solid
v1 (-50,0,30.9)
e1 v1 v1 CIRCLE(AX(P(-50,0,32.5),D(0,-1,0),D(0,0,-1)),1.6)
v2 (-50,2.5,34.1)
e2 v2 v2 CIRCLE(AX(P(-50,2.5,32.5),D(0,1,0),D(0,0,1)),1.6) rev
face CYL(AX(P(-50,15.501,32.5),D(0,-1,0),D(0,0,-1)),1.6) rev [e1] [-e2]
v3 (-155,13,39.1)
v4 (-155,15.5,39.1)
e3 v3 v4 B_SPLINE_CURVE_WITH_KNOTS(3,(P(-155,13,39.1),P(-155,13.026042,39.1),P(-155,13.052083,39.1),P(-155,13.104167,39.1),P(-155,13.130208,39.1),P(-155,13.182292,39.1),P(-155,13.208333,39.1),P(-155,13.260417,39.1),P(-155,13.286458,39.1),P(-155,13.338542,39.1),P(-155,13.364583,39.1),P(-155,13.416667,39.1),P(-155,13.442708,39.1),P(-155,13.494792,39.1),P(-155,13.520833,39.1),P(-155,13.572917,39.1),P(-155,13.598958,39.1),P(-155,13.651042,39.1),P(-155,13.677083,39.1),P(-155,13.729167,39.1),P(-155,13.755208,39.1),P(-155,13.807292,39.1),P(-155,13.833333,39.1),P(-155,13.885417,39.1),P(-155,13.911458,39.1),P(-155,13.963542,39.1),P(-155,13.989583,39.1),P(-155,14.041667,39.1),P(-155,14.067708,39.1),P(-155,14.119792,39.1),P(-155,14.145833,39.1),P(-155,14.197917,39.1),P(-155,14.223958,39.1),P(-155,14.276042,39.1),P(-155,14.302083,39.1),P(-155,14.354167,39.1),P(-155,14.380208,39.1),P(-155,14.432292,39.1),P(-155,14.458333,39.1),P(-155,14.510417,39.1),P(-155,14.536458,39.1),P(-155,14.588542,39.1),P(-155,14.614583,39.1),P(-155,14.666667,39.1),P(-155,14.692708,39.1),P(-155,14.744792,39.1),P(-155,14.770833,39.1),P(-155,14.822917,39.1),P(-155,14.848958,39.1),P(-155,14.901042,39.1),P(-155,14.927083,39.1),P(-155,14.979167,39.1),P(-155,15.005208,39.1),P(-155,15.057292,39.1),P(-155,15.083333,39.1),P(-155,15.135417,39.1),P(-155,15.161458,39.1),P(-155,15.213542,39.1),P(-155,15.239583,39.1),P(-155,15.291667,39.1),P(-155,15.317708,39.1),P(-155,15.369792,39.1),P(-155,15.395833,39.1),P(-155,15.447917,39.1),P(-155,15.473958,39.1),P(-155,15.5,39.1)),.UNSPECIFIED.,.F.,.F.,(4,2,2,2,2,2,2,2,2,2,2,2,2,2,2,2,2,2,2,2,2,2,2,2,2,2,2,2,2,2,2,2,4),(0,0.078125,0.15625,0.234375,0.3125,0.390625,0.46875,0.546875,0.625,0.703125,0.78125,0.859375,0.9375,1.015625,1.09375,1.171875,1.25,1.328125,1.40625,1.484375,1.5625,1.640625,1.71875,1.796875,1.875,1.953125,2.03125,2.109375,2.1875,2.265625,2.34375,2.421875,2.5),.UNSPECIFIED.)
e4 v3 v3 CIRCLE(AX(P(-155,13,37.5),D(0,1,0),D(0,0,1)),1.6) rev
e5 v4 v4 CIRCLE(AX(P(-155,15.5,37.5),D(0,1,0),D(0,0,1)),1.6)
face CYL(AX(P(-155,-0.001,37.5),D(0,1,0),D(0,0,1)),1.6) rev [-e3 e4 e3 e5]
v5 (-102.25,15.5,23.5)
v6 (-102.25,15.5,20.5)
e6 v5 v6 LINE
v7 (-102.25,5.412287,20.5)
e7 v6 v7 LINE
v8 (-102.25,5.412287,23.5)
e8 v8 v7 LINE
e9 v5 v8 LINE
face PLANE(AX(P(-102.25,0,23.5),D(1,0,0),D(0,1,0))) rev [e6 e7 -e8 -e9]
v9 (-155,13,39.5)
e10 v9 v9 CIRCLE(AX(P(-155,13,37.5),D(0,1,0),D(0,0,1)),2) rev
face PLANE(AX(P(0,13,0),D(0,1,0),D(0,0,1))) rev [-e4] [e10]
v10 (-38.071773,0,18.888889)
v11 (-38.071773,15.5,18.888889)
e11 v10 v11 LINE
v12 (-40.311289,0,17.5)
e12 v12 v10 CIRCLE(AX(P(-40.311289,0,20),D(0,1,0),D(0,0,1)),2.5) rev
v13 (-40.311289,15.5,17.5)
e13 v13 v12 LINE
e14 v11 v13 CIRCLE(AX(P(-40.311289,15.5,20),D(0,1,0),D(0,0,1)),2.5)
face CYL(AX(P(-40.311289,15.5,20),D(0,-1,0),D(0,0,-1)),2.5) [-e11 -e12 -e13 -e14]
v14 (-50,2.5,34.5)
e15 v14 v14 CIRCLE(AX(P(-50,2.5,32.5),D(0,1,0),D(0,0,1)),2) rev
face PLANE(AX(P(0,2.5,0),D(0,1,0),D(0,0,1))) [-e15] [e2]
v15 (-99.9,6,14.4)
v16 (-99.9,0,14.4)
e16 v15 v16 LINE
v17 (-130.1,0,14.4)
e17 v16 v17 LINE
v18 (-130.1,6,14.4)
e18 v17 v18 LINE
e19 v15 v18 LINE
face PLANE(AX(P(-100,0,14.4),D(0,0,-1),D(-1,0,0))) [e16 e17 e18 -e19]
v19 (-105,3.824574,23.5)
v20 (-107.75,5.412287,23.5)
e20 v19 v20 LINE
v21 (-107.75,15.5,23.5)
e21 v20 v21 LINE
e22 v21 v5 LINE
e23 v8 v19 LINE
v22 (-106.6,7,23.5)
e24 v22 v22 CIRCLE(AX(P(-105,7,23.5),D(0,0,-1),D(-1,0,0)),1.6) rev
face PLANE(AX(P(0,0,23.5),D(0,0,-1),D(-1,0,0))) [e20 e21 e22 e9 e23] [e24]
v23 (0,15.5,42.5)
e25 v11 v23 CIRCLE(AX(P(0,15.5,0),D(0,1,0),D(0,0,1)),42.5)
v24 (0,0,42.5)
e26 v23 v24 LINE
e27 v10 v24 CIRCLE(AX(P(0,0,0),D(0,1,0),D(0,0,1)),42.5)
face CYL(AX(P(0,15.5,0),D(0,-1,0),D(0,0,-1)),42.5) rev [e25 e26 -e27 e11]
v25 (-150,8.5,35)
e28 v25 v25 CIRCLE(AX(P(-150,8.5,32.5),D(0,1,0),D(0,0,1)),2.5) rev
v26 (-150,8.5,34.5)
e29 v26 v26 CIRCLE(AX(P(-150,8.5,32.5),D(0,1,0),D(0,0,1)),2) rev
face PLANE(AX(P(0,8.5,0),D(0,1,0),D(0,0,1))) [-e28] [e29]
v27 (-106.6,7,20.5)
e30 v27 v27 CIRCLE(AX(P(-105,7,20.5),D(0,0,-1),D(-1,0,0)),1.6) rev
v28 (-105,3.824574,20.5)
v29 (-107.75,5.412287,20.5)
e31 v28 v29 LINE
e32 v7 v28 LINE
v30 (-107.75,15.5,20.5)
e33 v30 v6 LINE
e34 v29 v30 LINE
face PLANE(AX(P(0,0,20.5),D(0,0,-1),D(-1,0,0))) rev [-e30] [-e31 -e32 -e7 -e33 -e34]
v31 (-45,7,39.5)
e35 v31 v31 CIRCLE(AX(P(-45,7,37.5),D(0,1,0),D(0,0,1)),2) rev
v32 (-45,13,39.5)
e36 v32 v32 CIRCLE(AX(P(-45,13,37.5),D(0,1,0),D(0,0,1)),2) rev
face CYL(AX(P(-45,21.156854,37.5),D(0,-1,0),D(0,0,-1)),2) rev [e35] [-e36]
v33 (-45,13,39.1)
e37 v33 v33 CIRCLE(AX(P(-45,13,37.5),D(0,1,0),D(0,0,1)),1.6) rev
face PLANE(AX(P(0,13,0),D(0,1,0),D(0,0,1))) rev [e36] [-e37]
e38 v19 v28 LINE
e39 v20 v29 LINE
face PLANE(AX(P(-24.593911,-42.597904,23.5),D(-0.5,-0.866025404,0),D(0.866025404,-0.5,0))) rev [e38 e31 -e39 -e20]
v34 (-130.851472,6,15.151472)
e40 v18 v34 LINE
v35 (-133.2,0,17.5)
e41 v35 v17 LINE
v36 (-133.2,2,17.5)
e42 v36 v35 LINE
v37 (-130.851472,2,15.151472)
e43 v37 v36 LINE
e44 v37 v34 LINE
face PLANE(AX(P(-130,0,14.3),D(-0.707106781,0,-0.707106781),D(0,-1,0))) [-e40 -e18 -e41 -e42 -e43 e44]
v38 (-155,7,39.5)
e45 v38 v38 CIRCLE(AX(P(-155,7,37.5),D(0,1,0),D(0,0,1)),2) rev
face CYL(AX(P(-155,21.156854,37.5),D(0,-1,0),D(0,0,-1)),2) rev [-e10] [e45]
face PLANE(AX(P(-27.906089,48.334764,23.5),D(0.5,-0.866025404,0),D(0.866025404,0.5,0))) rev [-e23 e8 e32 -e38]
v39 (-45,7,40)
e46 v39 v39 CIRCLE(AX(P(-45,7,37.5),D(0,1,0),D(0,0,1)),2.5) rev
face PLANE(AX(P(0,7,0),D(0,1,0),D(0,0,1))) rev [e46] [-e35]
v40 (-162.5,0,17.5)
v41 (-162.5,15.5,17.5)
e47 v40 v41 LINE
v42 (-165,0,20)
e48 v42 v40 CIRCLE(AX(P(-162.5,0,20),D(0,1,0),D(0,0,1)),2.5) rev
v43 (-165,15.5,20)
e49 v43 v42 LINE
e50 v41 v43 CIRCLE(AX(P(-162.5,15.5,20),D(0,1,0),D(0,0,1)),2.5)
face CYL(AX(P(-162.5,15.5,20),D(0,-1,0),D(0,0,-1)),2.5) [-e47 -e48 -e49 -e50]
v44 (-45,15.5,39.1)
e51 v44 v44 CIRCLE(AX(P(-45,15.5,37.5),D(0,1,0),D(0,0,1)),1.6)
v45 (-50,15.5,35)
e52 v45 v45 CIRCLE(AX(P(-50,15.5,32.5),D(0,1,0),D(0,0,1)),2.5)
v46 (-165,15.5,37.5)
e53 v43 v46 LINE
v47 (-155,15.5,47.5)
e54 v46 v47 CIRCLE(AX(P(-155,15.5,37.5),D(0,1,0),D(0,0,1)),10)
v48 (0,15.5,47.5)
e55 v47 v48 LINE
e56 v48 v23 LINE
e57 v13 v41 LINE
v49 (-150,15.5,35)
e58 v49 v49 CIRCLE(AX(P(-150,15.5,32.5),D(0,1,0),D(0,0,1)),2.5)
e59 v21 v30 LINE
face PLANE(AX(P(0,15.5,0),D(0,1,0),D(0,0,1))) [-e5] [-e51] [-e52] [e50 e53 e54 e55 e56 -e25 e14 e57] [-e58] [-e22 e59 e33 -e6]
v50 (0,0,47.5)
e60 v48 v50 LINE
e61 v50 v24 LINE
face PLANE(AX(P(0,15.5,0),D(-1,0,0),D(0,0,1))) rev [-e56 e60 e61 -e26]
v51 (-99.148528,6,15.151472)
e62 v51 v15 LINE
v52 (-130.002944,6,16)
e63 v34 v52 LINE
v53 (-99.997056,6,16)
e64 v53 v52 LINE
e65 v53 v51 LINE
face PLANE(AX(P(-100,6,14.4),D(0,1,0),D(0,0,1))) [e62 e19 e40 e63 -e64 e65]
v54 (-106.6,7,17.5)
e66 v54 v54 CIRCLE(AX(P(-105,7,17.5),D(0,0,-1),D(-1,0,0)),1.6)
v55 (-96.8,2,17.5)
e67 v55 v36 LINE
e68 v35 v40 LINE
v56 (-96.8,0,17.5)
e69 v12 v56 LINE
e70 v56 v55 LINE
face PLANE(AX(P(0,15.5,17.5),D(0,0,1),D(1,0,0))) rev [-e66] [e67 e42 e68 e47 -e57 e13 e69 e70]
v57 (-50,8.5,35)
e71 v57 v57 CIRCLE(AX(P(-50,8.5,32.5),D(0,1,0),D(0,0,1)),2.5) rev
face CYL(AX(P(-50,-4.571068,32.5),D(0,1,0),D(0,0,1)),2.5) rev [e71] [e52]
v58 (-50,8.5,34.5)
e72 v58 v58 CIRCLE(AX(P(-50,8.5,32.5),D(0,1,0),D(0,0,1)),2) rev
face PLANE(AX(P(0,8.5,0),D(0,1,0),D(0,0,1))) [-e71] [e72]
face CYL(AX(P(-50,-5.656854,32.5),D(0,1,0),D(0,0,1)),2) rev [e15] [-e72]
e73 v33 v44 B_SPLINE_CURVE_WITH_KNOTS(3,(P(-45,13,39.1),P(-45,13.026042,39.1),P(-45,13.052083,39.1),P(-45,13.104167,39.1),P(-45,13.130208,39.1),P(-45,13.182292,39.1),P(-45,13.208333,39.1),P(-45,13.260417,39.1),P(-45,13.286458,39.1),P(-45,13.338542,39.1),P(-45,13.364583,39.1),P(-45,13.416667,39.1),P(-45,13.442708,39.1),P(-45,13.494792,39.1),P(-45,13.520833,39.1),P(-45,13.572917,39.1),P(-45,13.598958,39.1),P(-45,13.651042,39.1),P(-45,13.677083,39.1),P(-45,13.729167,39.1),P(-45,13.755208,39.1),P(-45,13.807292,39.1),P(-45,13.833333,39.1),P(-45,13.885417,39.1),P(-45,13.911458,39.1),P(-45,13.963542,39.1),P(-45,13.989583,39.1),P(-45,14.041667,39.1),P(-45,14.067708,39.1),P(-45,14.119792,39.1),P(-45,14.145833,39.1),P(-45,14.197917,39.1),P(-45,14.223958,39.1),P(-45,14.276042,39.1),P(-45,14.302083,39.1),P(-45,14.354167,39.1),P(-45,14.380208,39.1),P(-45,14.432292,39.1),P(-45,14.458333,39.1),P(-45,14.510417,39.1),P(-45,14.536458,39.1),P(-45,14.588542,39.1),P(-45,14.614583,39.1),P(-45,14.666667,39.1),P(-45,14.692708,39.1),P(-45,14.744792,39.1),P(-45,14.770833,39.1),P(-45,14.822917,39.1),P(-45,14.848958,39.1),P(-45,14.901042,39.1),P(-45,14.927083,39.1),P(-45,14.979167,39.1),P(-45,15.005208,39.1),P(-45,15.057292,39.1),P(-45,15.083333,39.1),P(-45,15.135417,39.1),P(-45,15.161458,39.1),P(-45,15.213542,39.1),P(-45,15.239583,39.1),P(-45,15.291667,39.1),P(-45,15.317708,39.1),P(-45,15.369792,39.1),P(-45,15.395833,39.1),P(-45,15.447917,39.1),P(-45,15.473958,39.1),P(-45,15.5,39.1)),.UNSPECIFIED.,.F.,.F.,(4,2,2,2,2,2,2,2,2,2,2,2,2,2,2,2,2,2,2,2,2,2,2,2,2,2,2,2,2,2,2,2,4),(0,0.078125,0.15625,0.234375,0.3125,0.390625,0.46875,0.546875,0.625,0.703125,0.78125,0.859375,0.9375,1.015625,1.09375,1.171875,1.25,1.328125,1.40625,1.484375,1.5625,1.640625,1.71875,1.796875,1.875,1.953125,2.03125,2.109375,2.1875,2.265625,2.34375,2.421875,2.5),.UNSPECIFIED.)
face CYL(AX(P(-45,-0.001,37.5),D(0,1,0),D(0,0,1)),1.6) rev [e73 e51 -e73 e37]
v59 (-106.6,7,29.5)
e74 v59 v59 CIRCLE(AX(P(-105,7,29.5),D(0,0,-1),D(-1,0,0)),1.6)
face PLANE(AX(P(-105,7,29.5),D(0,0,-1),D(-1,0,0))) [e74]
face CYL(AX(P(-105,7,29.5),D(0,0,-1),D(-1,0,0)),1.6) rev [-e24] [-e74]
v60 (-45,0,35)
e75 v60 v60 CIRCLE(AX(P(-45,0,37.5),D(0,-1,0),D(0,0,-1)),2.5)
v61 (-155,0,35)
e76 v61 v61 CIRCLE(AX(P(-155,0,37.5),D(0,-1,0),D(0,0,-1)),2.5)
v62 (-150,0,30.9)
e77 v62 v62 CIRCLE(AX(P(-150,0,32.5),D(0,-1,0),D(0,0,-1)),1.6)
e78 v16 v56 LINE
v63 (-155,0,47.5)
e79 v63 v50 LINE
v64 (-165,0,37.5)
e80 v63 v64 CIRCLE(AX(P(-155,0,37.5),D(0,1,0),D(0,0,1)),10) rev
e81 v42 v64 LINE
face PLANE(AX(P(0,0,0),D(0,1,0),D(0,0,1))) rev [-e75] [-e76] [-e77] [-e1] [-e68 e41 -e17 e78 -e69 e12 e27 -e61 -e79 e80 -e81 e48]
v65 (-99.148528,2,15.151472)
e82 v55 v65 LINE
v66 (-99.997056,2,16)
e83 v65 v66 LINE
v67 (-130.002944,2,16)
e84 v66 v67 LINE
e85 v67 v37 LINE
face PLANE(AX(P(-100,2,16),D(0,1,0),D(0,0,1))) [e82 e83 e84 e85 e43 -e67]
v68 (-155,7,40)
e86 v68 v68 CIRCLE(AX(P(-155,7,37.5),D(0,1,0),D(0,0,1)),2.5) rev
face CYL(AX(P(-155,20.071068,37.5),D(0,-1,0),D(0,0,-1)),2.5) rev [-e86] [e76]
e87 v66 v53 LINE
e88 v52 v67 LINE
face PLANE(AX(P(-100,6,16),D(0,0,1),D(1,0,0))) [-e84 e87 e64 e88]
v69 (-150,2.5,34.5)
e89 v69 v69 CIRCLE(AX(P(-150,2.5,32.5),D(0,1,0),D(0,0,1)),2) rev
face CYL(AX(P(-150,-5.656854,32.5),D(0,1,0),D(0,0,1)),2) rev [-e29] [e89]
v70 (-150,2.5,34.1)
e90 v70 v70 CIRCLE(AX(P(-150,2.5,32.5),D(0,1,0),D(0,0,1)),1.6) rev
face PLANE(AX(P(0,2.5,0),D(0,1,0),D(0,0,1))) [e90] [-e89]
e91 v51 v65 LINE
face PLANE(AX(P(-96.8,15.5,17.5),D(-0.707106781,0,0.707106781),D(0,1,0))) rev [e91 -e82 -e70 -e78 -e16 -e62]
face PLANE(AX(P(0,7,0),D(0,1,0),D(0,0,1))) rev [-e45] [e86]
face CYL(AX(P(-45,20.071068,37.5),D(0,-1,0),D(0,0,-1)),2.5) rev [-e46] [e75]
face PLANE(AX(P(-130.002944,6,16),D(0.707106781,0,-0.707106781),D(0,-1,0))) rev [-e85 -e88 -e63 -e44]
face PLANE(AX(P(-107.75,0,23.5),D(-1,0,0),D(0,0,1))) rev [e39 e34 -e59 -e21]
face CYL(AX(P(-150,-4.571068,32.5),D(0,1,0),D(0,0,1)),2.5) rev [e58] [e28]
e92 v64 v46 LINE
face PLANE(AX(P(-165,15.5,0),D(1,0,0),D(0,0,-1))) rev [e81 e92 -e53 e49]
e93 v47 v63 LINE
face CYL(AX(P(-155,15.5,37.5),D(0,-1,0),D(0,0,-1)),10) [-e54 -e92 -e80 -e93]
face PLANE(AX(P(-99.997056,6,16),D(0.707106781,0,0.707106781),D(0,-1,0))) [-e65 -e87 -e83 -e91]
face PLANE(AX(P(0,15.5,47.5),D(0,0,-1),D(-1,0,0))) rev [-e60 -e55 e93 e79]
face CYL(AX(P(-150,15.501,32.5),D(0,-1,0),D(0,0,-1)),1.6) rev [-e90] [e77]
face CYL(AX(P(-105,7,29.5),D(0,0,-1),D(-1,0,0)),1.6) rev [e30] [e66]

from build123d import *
from OCP.BRepFilletAPI import BRepFilletAPI_MakeChamfer, BRepFilletAPI_MakeFillet

# Parameters (mm, degrees)
BOSS_EXTRU_1_DEPTH      = 15.5
BOSS_EXTRU_2_START      = -35
BOSS_EXTRU_2_DEPTH      = 30
CHANFREIN1_SIZE         = 3.2
CHANFREIN2_SIZE         = 1.2
CHANFREIN2_SIZE2        = 1.697056275
CONG_1_R1               = 10
CONG_1_R2               = 2.5
ENL_V_MAT_EXTRU_1_REACH = 174.399
ESQUISSE3_R             = 1.6
ESQUISSE4_R             = 2
ENL_V_MAT_EXTRU_2_DEPTH = 13
ESQUISSE9_R             = 2.5
ENL_V_MAT_EXTRU_7_DEPTH = 7
ENL_V_MAT_EXTRU_3_REACH = 174.399
ESQUISSE5_R             = 1.6
ESQUISSE6_R             = 2
ENL_V_MAT_EXTRU_4_DEPTH = 13
ESQUISSE10_R            = 2.5
ENL_V_MAT_EXTRU_8_DEPTH = 7
ESQUISSE7_R             = 1.6
ENL_V_MAT_EXTRU_5_DEPTH = 12
ENL_V_START             = -3
ENL_V_MAT_EXTRU_6_DEPTH = 3


with BuildPart() as part:
    # Esquisse1 → Boss.-Extru.1 (new body)
    with BuildSketch(Plane(origin=(0, 0, 0), x_dir=(1, 0, 0), z_dir=(0, 1, 0))):
        with BuildLine():
            ThreePointArc((0, -42.5), (-23.048861143, -35.707142143), (-38.729833462, -17.5))
            Line((-38.729833462, -17.5), (-165, -17.5))
            Line((-165, -17.5), (-165, -47.5))
            Line((-165, -47.5), (0, -47.5))
            Line((0, -47.5), (0, -42.5))
        make_face()
    extrude(amount=BOSS_EXTRU_1_DEPTH)

    # Esquisse11 → Boss.-Extru.2 (add)
    with BuildSketch(Plane.ZY.offset(165).offset(BOSS_EXTRU_2_START)):
        Polygon((17.5, 0), (14.4, 0), (14.4, 6), (16, 6), (16, 2), (17.5, 2), align=None)
    extrude(amount=-BOSS_EXTRU_2_DEPTH)

    # Chanfrein1
    # the kernel refuses this chamfer: 3.2 mm, written as the material it adds along each edge
    with BuildSketch(Plane(origin=(-100, 10.229385561, 17.5), x_dir=(0.9996219169112968, 0, 0.027495876610586226), z_dir=(0, -1, 0))) as chanfrein1_piece_1_section:
        Polygon((CHANFREIN1_SIZE * 0.999621916911, -CHANFREIN1_SIZE * 0.0274958766106), (-CHANFREIN1_SIZE * 0.0274958766106, -CHANFREIN1_SIZE * 0.999621916911), (0, 0), align=None)
    chanfrein1_piece_1 = extrude(amount=10.229385561, mode=Mode.PRIVATE)
    chanfrein1_piece_1 = split(chanfrein1_piece_1, bisect_by=Plane(origin=(-99.489179746, 2, 15.404286374), z_dir=(0, 1, 0)), keep=Keep.TOP, mode=Mode.PRIVATE)
    chanfrein1_piece_1 = split(chanfrein1_piece_1, bisect_by=Plane(origin=(-99.489179746, 4, 14.4), z_dir=(0, 0, 1)), keep=Keep.TOP, mode=Mode.PRIVATE)
    chanfrein1_piece_1 = split(chanfrein1_piece_1, bisect_by=Plane(origin=(-99.489179746, 6, 15.404286374), z_dir=(0, -1, 0)), keep=Keep.TOP, mode=Mode.PRIVATE)
    chanfrein1_piece_1 = split(chanfrein1_piece_1, bisect_by=Plane(origin=(-99.489179746, 4, 16), z_dir=(0, 0, -1)), keep=Keep.TOP, mode=Mode.PRIVATE)
    add(chanfrein1_piece_1)
    with BuildSketch(Plane(origin=(-100, 2, 17.5), x_dir=(0.9996219169112968, 0, 0.027495876610585147), z_dir=(0, -1, 0))) as chanfrein1_piece_2_section:
        Polygon((CHANFREIN1_SIZE * 0.999621916911, -CHANFREIN1_SIZE * 0.0274958766106), (-CHANFREIN1_SIZE * 0.0274958766106, -CHANFREIN1_SIZE * 0.999621916911), (0, 0), align=None)
    chanfrein1_piece_2 = extrude(amount=2, mode=Mode.PRIVATE)
    chanfrein1_piece_2 = split(chanfrein1_piece_2, bisect_by=Plane(origin=(-98.721329155, 1, 16), z_dir=(0, 0, 1)), keep=Keep.TOP, mode=Mode.PRIVATE)
    add(chanfrein1_piece_2)
    with BuildSketch(Plane(origin=(-100, 2, 17.5), x_dir=(0.9996219169112968, 0, 0.027495876610585147), z_dir=(0, -1, 0))) as chanfrein1_piece_3_section:
        Polygon((CHANFREIN1_SIZE * 0.999621916911, -CHANFREIN1_SIZE * 0.0274958766106), (-CHANFREIN1_SIZE * 0.0274958766106, -CHANFREIN1_SIZE * 0.999621916911), (0, 0), align=None)
    chanfrein1_piece_3 = extrude(amount=2, mode=Mode.PRIVATE)
    chanfrein1_piece_3 = split(chanfrein1_piece_3, bisect_by=Plane(origin=(-99.489179746, 1, 14.4), z_dir=(0, 0, 1)), keep=Keep.TOP, mode=Mode.PRIVATE)
    chanfrein1_piece_3 = split(chanfrein1_piece_3, bisect_by=Plane(origin=(-99.489179746, 1, 16), z_dir=(0, 0, -1)), keep=Keep.TOP, mode=Mode.PRIVATE)
    add(chanfrein1_piece_3)
    with BuildSketch(Plane(origin=(-130, 10.229385561, 17.5), x_dir=(-0.9996219169112966, 0, 0.02749587661058634), z_dir=(0, -1, 0))) as chanfrein1_piece_4_section:
        Polygon((CHANFREIN1_SIZE * 0.999621916911, CHANFREIN1_SIZE * 0.0274958766106), (-CHANFREIN1_SIZE * 0.0274958766106, CHANFREIN1_SIZE * 0.999621916911), (0, 0), align=None)
    chanfrein1_piece_4 = extrude(amount=10.229385561, mode=Mode.PRIVATE)
    chanfrein1_piece_4 = split(chanfrein1_piece_4, bisect_by=Plane(origin=(-130.510820254, 2, 15.404286374), z_dir=(0, 1, 0)), keep=Keep.TOP, mode=Mode.PRIVATE)
    chanfrein1_piece_4 = split(chanfrein1_piece_4, bisect_by=Plane(origin=(-130.510820254, 4, 14.4), z_dir=(0, 0, 1)), keep=Keep.TOP, mode=Mode.PRIVATE)
    chanfrein1_piece_4 = split(chanfrein1_piece_4, bisect_by=Plane(origin=(-130.510820254, 6, 15.404286374), z_dir=(0, -1, 0)), keep=Keep.TOP, mode=Mode.PRIVATE)
    chanfrein1_piece_4 = split(chanfrein1_piece_4, bisect_by=Plane(origin=(-130.510820254, 4, 16), z_dir=(0, 0, -1)), keep=Keep.TOP, mode=Mode.PRIVATE)
    add(chanfrein1_piece_4)
    with BuildSketch(Plane(origin=(-130, 2, 17.5), x_dir=(-0.9996219169112966, 0, 0.027495876610585262), z_dir=(0, -1, 0))) as chanfrein1_piece_5_section:
        Polygon((CHANFREIN1_SIZE * 0.999621916911, CHANFREIN1_SIZE * 0.0274958766106), (-CHANFREIN1_SIZE * 0.0274958766106, CHANFREIN1_SIZE * 0.999621916911), (0, 0), align=None)
    chanfrein1_piece_5 = extrude(amount=2, mode=Mode.PRIVATE)
    chanfrein1_piece_5 = split(chanfrein1_piece_5, bisect_by=Plane(origin=(-131.278670845, 1, 16), z_dir=(0, 0, 1)), keep=Keep.TOP, mode=Mode.PRIVATE)
    add(chanfrein1_piece_5)
    with BuildSketch(Plane(origin=(-130, 2, 17.5), x_dir=(-0.9996219169112966, 0, 0.027495876610585262), z_dir=(0, -1, 0))) as chanfrein1_piece_6_section:
        Polygon((CHANFREIN1_SIZE * 0.999621916911, CHANFREIN1_SIZE * 0.0274958766106), (-CHANFREIN1_SIZE * 0.0274958766106, CHANFREIN1_SIZE * 0.999621916911), (0, 0), align=None)
    chanfrein1_piece_6 = extrude(amount=2, mode=Mode.PRIVATE)
    chanfrein1_piece_6 = split(chanfrein1_piece_6, bisect_by=Plane(origin=(-130.510820254, 1, 14.4), z_dir=(0, 0, 1)), keep=Keep.TOP, mode=Mode.PRIVATE)
    chanfrein1_piece_6 = split(chanfrein1_piece_6, bisect_by=Plane(origin=(-130.510820254, 1, 16), z_dir=(0, 0, -1)), keep=Keep.TOP, mode=Mode.PRIVATE)
    add(chanfrein1_piece_6)

    # Chanfrein2: one chamfer whose edges measure the first distance from different faces: ONE call of the kernel's chamfer builder (chamfer() names one face for all edges)
    chanfrein2_edges_1 = [part.edges().sort_by_distance(p)[0] for p in [
        (-98.3, 4, 16),
    ]]
    chanfrein2_side_1 = [part.faces().sort_by_distance(p)[0] for p in [
        (-98.730952381, 2.523809524, 15.569047619),
    ]]
    chanfrein2_edges_2 = [part.edges().sort_by_distance(p)[0] for p in [
        (-131.7, 4, 16),
    ]]
    chanfrein2_side_2 = [part.faces().sort_by_distance(p)[0] for p in [
        (-131.269047619, 2.523809524, 15.569047619),
    ]]
    chanfrein2 = BRepFilletAPI_MakeChamfer(part.part.solid().wrapped)
    for e in chanfrein2_edges_1:
        chanfrein2.Add(CHANFREIN2_SIZE, CHANFREIN2_SIZE2, e.wrapped, chanfrein2_side_1[0].wrapped)  # the first distance lies on this face
    for e in chanfrein2_edges_2:
        chanfrein2.Add(CHANFREIN2_SIZE, CHANFREIN2_SIZE2, e.wrapped, chanfrein2_side_2[0].wrapped)  # the first distance lies on this face
    add(Compound.cast(chanfrein2.Shape()), mode=Mode.REPLACE)

    # Congé1: one fillet with a radius per group of edges: ONE call of the kernel's fillet builder (fillet() takes one radius for all edges)
    cong_1_edges_1 = [part.edges().sort_by_distance(p)[0] for p in [
        (-165, 7.75, 47.5),
    ]]
    cong_1_edges_2 = [part.edges().sort_by_distance(p)[0] for p in [
        (-165, 7.75, 17.5),
        (-38.729833462, 7.75, 17.5),
    ]]
    cong_1 = BRepFilletAPI_MakeFillet(part.part.solid().wrapped)
    for e in cong_1_edges_1:
        cong_1.Add(CONG_1_R1, e.wrapped)
    for e in cong_1_edges_2:
        cong_1.Add(CONG_1_R2, e.wrapped)
    add(Compound.cast(cong_1.Shape()), mode=Mode.REPLACE)

    # Esquisse3 → Enlèv. mat.-Extru.1 (cut, up to next)
    with BuildSketch(Plane(origin=(0, 15.5, 0), x_dir=(1, 0, 0), z_dir=(0, 1, 0)), mode=Mode.PRIVATE) as enl_v_mat_extru_1_sk1:
        with Locations(Location((-155, -37.5, 0), (0, 0, 270))):
            Circle(ESQUISSE3_R)
    enl_v_mat_extru_1_tool1 = extrude(enl_v_mat_extru_1_sk1.sketch, amount=-ENL_V_MAT_EXTRU_1_REACH, mode=Mode.PRIVATE) & part.part
    # Esquisse3 → Enlèv. mat.-Extru.1 (cut, up to next)
    with BuildSketch(Plane(origin=(0, 15.5, 0), x_dir=(1, 0, 0), z_dir=(0, 1, 0)), mode=Mode.PRIVATE) as enl_v_mat_extru_1_sk2:
        with Locations(Location((-45, -37.5, 0), (0, 0, 270))):
            Circle(ESQUISSE3_R)
    enl_v_mat_extru_1_tool2 = extrude(enl_v_mat_extru_1_sk2.sketch, amount=-ENL_V_MAT_EXTRU_1_REACH, mode=Mode.PRIVATE) & part.part
    add(enl_v_mat_extru_1_tool1.solids().sort_by_distance((-155, 15.5, 37.5))[0], mode=Mode.SUBTRACT)
    add(enl_v_mat_extru_1_tool2.solids().sort_by_distance((-45, 15.5, 37.5))[0], mode=Mode.SUBTRACT)

    # Esquisse4 → Enlèv. mat.-Extru.2 (cut)
    with BuildSketch(Plane.XZ):
        with Locations(Location((-155, 37.5, 0), (0, 0, 270))):
            Circle(ESQUISSE4_R)
        with Locations(Location((-45, 37.5, 0), (0, 0, 270))):
            Circle(ESQUISSE4_R)
    extrude(amount=-ENL_V_MAT_EXTRU_2_DEPTH, mode=Mode.SUBTRACT)

    # Esquisse9 → Enlèv. mat.-Extru.7 (cut)
    with BuildSketch(Plane.XZ):
        with Locations(Location((-155, 37.5, 0), (0, 0, 270))):
            Circle(ESQUISSE9_R)
        with Locations(Location((-45, 37.5, 0), (0, 0, 270))):
            Circle(ESQUISSE9_R)
    extrude(amount=-ENL_V_MAT_EXTRU_7_DEPTH, mode=Mode.SUBTRACT)

    # Esquisse5 → Enlèv. mat.-Extru.3 (cut, up to next)
    with BuildSketch(Plane.XZ, mode=Mode.PRIVATE) as enl_v_mat_extru_3_sk1:
        with Locations(Location((-150, 32.5, 0), (0, 0, 270))):
            Circle(ESQUISSE5_R)
    enl_v_mat_extru_3_tool1 = extrude(enl_v_mat_extru_3_sk1.sketch, amount=-ENL_V_MAT_EXTRU_3_REACH, mode=Mode.PRIVATE) & part.part
    # Esquisse5 → Enlèv. mat.-Extru.3 (cut, up to next)
    with BuildSketch(Plane.XZ, mode=Mode.PRIVATE) as enl_v_mat_extru_3_sk2:
        with Locations(Location((-50, 32.5, 0), (0, 0, 270))):
            Circle(ESQUISSE5_R)
    enl_v_mat_extru_3_tool2 = extrude(enl_v_mat_extru_3_sk2.sketch, amount=-ENL_V_MAT_EXTRU_3_REACH, mode=Mode.PRIVATE) & part.part
    add(enl_v_mat_extru_3_tool1.solids().sort_by_distance((-150, 0, 32.5))[0], mode=Mode.SUBTRACT)
    add(enl_v_mat_extru_3_tool2.solids().sort_by_distance((-50, 0, 32.5))[0], mode=Mode.SUBTRACT)

    # Esquisse6 → Enlèv. mat.-Extru.4 (cut)
    with BuildSketch(Plane(origin=(0, 15.5, 0), x_dir=(1, 0, 0), z_dir=(0, 1, 0))):
        with Locations(Location((-150, -32.5, 0), (0, 0, 270))):
            Circle(ESQUISSE6_R)
        with Locations(Location((-50, -32.5, 0), (0, 0, 270))):
            Circle(ESQUISSE6_R)
    extrude(amount=-ENL_V_MAT_EXTRU_4_DEPTH, mode=Mode.SUBTRACT)

    # Esquisse10 → Enlèv. mat.-Extru.8 (cut)
    with BuildSketch(Plane(origin=(0, 15.5, 0), x_dir=(1, 0, 0), z_dir=(0, 1, 0))):
        with Locations(Location((-50, -32.5, 0), (0, 0, 270))):
            Circle(ESQUISSE10_R)
        with Locations(Location((-150, -32.5, 0), (0, 0, 270))):
            Circle(ESQUISSE10_R)
    extrude(amount=-ENL_V_MAT_EXTRU_8_DEPTH, mode=Mode.SUBTRACT)

    # Esquisse7 → Enlèv. mat.-Extru.5 (cut)
    with BuildSketch(Plane(origin=(0, 0, 17.5), x_dir=(-1, 0, 0), z_dir=(0, 0, -1))):
        with Locations((105, 7)):
            Circle(ESQUISSE7_R)
    extrude(amount=-ENL_V_MAT_EXTRU_5_DEPTH, mode=Mode.SUBTRACT)

    # Esquisse8 → Enlèv. mat.-Extru.6 (cut)
    with BuildSketch(Plane(origin=(0, 0, 17.5), x_dir=(-1, 0, 0), z_dir=(0, 0, -1)).offset(ENL_V_START)):
        Polygon((102.25, 5.41228676), (105, 3.824573519), (107.75, 5.41228676), (107.75, 8.58771324), (102.25, 8.58771324), align=None)
        Polygon((102.25, 8.58771324), (107.75, 8.58771324), (105, 10.175426481), align=None)
        Polygon((105, 10.175426481), (107.75, 8.58771324), (107.75, 15.5), (102.25, 15.5), (102.25, 8.58771324), align=None)
    extrude(amount=-ENL_V_MAT_EXTRU_6_DEPTH, mode=Mode.SUBTRACT)


solid = part.part
